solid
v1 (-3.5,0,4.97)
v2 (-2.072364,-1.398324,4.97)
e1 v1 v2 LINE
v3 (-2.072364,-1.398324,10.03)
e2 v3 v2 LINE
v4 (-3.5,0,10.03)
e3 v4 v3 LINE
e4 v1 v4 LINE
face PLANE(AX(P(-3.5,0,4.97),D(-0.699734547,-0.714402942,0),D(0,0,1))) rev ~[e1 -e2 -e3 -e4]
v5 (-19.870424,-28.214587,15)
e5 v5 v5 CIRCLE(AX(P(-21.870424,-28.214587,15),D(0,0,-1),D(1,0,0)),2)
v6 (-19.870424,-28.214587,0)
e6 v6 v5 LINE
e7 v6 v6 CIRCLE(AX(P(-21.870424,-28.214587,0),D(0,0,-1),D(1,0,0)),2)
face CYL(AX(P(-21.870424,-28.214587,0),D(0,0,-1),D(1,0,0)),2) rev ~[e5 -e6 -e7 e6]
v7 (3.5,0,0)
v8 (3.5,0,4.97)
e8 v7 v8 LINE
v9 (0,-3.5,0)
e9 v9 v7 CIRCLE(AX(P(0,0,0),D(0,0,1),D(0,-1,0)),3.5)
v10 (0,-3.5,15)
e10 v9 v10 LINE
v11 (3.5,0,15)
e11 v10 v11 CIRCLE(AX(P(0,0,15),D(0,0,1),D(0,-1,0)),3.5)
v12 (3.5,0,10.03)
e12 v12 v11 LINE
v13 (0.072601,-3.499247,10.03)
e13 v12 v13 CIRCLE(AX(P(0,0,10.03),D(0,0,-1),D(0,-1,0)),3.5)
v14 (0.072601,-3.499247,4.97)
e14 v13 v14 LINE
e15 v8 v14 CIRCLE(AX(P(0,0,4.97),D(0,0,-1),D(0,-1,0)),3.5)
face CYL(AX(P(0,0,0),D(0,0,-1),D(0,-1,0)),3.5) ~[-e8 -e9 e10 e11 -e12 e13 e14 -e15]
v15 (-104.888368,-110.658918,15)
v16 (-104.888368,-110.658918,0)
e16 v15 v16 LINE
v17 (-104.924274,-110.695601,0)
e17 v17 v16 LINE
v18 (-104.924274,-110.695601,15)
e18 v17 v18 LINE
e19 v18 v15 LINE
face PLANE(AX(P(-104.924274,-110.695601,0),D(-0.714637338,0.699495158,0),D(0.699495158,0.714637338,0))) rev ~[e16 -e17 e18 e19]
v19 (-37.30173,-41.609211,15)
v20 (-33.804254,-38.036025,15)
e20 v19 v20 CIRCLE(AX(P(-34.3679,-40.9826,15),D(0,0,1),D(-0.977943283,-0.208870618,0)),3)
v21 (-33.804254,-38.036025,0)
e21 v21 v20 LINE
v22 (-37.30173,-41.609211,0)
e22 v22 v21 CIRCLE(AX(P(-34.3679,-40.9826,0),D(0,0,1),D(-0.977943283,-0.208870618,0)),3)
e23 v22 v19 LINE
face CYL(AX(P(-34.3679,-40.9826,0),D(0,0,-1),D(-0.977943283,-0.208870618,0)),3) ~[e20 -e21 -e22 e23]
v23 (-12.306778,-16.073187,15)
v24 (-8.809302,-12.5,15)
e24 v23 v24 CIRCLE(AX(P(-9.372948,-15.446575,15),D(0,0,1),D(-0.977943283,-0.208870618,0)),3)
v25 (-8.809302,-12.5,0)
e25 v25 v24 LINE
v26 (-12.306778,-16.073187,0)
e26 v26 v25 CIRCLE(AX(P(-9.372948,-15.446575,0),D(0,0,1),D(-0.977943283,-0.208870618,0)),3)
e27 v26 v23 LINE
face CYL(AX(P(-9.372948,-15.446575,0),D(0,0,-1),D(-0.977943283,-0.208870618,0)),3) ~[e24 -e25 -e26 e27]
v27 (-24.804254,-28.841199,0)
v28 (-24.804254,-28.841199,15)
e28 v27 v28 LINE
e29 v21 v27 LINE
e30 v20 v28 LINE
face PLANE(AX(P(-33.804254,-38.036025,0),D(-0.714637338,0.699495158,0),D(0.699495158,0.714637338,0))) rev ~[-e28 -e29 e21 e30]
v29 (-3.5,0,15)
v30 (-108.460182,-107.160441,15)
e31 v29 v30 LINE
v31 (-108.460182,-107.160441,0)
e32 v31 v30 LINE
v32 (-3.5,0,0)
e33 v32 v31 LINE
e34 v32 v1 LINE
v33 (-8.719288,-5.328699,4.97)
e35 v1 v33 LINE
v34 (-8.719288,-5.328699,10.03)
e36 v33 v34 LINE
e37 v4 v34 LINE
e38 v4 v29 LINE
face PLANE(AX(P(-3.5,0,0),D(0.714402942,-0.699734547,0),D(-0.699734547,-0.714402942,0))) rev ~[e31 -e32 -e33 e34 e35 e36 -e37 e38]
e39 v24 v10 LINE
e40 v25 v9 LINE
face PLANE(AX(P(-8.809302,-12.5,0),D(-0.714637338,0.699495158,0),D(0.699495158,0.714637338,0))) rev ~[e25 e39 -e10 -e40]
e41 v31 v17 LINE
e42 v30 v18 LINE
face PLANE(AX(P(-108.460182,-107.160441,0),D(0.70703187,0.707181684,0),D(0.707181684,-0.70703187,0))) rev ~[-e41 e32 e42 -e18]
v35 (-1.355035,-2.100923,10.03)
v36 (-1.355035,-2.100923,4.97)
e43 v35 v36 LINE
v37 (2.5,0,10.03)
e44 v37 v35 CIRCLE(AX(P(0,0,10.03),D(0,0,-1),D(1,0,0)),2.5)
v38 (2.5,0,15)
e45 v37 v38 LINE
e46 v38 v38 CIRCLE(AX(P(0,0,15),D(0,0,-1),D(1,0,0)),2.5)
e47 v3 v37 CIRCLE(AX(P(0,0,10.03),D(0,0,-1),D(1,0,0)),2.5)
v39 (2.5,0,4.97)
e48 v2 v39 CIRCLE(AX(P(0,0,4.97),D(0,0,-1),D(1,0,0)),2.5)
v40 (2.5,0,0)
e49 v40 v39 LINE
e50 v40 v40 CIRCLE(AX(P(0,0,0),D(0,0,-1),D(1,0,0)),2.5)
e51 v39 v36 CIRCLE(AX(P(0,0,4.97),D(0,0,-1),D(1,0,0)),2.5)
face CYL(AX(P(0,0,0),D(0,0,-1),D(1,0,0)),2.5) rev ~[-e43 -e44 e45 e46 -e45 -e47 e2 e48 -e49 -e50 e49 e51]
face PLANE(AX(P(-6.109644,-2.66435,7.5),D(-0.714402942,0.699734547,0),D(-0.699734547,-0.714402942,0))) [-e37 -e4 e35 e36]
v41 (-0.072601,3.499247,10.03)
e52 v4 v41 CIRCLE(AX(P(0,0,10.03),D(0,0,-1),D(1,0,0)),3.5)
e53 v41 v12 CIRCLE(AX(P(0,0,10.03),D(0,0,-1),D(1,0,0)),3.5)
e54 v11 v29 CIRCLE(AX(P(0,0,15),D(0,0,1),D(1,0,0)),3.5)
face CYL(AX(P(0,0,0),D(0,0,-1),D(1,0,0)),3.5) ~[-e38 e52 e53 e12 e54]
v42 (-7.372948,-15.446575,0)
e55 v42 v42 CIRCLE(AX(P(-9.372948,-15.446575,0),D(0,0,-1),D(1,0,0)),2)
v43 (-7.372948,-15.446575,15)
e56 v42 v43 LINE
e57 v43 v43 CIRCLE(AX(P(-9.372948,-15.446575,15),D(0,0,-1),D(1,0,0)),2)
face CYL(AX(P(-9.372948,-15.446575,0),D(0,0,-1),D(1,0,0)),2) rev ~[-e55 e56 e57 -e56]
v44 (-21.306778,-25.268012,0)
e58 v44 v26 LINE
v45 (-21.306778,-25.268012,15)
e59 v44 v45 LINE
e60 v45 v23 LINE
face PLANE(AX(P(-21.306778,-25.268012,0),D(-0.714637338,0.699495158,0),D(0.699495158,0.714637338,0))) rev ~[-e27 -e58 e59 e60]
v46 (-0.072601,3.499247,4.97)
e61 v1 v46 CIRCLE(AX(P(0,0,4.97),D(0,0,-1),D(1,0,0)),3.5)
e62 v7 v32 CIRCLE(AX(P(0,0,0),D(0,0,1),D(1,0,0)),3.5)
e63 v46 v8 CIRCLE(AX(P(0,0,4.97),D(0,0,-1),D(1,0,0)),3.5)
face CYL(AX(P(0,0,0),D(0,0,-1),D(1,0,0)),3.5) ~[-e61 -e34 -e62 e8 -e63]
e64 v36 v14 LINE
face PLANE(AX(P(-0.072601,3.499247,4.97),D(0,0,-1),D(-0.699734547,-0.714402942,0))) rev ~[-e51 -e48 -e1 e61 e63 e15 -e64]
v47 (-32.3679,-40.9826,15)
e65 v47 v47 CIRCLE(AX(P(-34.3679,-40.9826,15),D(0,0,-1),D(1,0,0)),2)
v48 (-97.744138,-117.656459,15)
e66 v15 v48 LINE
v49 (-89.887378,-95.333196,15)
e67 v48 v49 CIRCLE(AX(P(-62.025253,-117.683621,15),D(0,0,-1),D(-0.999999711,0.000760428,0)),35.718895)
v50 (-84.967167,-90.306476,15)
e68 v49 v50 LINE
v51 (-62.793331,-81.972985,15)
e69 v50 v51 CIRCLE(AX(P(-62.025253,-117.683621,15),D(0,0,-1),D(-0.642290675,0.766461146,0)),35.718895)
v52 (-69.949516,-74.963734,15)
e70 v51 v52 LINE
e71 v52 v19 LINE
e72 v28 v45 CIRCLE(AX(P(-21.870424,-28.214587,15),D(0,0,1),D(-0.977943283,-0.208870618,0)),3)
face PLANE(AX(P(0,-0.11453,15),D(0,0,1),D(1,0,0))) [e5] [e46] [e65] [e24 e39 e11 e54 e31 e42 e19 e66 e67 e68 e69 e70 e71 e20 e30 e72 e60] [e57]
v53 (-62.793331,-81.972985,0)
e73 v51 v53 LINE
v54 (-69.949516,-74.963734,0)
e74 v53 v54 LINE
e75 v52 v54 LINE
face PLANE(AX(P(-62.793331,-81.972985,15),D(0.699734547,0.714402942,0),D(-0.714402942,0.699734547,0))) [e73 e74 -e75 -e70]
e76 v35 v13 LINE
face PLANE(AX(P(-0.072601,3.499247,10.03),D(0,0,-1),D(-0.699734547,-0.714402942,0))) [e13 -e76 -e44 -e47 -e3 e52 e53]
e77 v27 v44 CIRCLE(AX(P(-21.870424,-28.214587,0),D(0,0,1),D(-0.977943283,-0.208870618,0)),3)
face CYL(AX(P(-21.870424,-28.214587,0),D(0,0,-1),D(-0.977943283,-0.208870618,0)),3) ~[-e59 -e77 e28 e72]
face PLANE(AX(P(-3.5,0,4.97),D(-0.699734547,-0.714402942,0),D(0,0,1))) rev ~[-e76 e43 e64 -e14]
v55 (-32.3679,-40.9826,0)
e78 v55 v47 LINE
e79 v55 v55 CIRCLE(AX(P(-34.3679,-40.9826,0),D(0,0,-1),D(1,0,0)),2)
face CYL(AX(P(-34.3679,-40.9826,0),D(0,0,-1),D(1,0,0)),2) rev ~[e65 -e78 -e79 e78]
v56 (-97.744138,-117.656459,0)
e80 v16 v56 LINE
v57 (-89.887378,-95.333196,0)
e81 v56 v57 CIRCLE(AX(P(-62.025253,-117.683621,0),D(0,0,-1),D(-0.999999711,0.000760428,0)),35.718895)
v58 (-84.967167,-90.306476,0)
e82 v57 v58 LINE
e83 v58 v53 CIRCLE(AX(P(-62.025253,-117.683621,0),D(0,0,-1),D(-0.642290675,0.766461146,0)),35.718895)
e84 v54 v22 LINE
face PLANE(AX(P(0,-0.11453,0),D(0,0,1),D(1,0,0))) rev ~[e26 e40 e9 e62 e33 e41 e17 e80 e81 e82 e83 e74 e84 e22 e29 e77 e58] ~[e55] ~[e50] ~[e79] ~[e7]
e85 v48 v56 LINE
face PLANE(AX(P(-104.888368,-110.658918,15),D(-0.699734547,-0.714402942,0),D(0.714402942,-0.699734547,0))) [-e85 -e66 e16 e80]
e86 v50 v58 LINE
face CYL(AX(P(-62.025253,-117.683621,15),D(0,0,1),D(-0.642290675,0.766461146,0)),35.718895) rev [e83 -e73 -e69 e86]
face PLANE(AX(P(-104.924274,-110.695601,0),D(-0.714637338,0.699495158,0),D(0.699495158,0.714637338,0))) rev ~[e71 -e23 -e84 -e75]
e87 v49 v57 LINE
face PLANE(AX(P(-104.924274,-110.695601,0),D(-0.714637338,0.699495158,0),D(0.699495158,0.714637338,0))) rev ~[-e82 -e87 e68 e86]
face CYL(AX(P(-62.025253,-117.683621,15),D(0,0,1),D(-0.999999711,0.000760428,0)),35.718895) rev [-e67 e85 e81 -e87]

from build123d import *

# Parameters (mm, degrees)
F1_DEPTH  = 15
F2_DEPTH  = 15
F3_W      = 7.4589547733
F3_H      = 5.06
F4_DEPTH  = 25
F5_W      = 8.8782840291
F5_H      = 5.06
F6_DEPTH  = 25
F7_W      = 4.8981418308
F7_H      = 5.06
F8_DEPTH  = 25
F9_DEPTH  = 25
F10_DEPTH = 25
F11_R     = 2.5
F12_DEPTH = 25
F14_DEPTH = 15
F11_R_2   = 2
F15_DEPTH = 25


with BuildPart() as f1:
    # F0 (on Top) → F1 (new body)
    with BuildSketch(Plane.XY):
        with BuildLine():
            ThreePointArc((0, -3.5), (2.4748737342, -2.4748737342), (3.5, 0))
            ThreePointArc((3.5, 0), (0, 3.5), (-3.5, 0))
            ThreePointArc((-3.5, 0), (-2.4748737342, -2.4748737342), (0, -3.5))
        make_face()
    extrude(amount=F1_DEPTH)

    # F0 (on Top) → F2 (join)
    with BuildSketch(Plane.XY):
        with BuildLine():
            ThreePointArc((0, -3.5), (2.4748737342, -2.4748737342), (3.5, 0))
            ThreePointArc((3.5, 0), (0, 3.5), (-3.5, 0))
            ThreePointArc((-3.5, 0), (-2.4748737342, -2.4748737342), (0, -3.5))
        make_face()
        with BuildLine():
            ThreePointArc((0, -3.5), (-2.4748737342, -2.4748737342), (-3.5, 0))
            Line((-3.5, 0), (-108.4601820875, -107.1604412839))
            Line((-108.4601820875, -107.1604412839), (-104.9242736666, -110.6956006351))
            Line((-104.9242736666, -110.6956006351), (-37.3017297765, -41.6092114188))
            Line((-37.3017297765, -41.6092114188), (-33.8042539876, -38.0360247309))
            Line((-33.8042539876, -38.0360247309), (-24.8042539876, -28.8411990533))
            Line((-24.8042539876, -28.8411990533), (-21.3067781987, -25.2680123655))
            Line((-21.3067781987, -25.2680123655), (-12.3067781987, -16.0731866878))
            Line((-12.3067781987, -16.0731866878), (-8.8093024098, -12.5))
            Line((-8.8093024098, -12.5), (0, -3.5))
        make_face()
        with BuildLine():
            ThreePointArc((-12.3067781987, -16.0731866878), (-7.2290363366, -17.5450603078), (-8.8093024098, -12.5))
            Line((-8.8093024098, -12.5), (-12.3067781987, -16.0731866878))
        make_face()
        with BuildLine():
            Line((-33.8042539876, -38.0360247309), (-37.3017297765, -41.6092114188))
            ThreePointArc((-37.3017297765, -41.6092114188), (-32.2239879144, -43.0810850387), (-33.8042539876, -38.0360247309))
        make_face()
        with BuildLine():
            ThreePointArc((-24.8042539876, -28.8411990533), (-19.7265121255, -30.3130726732), (-21.3067781987, -25.2680123655))
            Line((-21.3067781987, -25.2680123655), (-24.8042539876, -28.8411990533))
        make_face()
    extrude(amount=F2_DEPTH)

    # F3 (on face) → F4 (join)
    with BuildSketch(Plane(origin=(-1.7863004718, 1.7496234668, 0), x_dir=(-0.6997345473, -0.7144029419, 0), z_dir=(-0.7144029419, 0.6997345473, 0))):
        with Locations((6.178548302, 7.5)):
            Rectangle(F3_W, F3_H)
    extrude(amount=F4_DEPTH)

    # F5 (on face) → F6 (cut)
    with BuildSketch(Plane(origin=(-1.7136995282, -1.7496234668, 0), x_dir=(-0.7144029419, 0.6997345473, 0), z_dir=(0.6997345473, 0.7144029419, 0))):
        with Locations((6.9395523112, 7.5)):
            Rectangle(F5_W, F5_H)
    extrude(amount=F6_DEPTH, mode=Mode.SUBTRACT)

    # F7 (on face) → F8 (cut)
    with BuildSketch(Plane(origin=(-1.7863004718, 1.7496234668, 0), x_dir=(-0.6997345473, -0.7144029419, 0), z_dir=(-0.7144029419, 0.6997345473, 0))):
        with Locations((0, 7.5)):
            Rectangle(F7_W, F7_H)
    extrude(amount=-F8_DEPTH, mode=Mode.SUBTRACT)

    # F9 (cut): a face of the model
    f9_faces = [f1.faces().sort_by_distance(p)[0] for p in [
        (1.7136995282, 1.7496234668, 7.5),
    ]]
    extrude(f9_faces, amount=-F9_DEPTH, mode=Mode.SUBTRACT)

    # F10 (cut): a face of the model
    f10_faces = [f1.faces().sort_by_distance(p)[0] for p in [
        (-23.9697177179, 14.8290140645, 7.5),
    ]]
    extrude(f10_faces, amount=-F10_DEPTH, mode=Mode.SUBTRACT)

    # F11 (on face) → F12 (cut)
    with BuildSketch(Plane(origin=(0, 0, 0), x_dir=(1, 0, 0), z_dir=(0, 0, -1))):
        Circle(F11_R)
    extrude(amount=-F12_DEPTH, mode=Mode.SUBTRACT)

    # F13 (on face) → F14 (join)
    with BuildSketch(Plane.XY.offset(15)):
        with BuildLine():
            Line((-89.8873776378, -95.3331964442), (-104.8883679048, -110.6589176106))
            Line((-104.8883679048, -110.6589176106), (-97.7441379591, -117.6564594926))
            ThreePointArc((-97.7441379591, -117.6564594926), (-95.7182525009, -105.8252374674), (-89.8873776378, -95.3331964442))
        make_face()
        with BuildLine():
            Line((-62.7933306081, -81.9729853935), (-69.9495157778, -74.9637337568))
            Line((-69.9495157778, -74.9637337568), (-84.9671665368, -90.3064760697))
            ThreePointArc((-84.9671665368, -90.3064760697), (-74.5911866059, -84.2480596514), (-62.7933306081, -81.9729853935))
        make_face()
    extrude(amount=-F14_DEPTH)

    # F11 (on face) → F15 (cut)
    with BuildSketch(Plane(origin=(0, 0, 0), x_dir=(1, 0, 0), z_dir=(0, 0, -1))):
        Circle(F11_R)
        with Locations((-34.3678999271, 40.9825995654)):
            Circle(F11_R_2)
        with Locations((-21.8704241382, 28.2145871999)):
            Circle(F11_R_2)
        with Locations((-9.3729483493, 15.4465748344)):
            Circle(F11_R_2)
    extrude(amount=-F15_DEPTH, mode=Mode.SUBTRACT)


solid = f1.part
